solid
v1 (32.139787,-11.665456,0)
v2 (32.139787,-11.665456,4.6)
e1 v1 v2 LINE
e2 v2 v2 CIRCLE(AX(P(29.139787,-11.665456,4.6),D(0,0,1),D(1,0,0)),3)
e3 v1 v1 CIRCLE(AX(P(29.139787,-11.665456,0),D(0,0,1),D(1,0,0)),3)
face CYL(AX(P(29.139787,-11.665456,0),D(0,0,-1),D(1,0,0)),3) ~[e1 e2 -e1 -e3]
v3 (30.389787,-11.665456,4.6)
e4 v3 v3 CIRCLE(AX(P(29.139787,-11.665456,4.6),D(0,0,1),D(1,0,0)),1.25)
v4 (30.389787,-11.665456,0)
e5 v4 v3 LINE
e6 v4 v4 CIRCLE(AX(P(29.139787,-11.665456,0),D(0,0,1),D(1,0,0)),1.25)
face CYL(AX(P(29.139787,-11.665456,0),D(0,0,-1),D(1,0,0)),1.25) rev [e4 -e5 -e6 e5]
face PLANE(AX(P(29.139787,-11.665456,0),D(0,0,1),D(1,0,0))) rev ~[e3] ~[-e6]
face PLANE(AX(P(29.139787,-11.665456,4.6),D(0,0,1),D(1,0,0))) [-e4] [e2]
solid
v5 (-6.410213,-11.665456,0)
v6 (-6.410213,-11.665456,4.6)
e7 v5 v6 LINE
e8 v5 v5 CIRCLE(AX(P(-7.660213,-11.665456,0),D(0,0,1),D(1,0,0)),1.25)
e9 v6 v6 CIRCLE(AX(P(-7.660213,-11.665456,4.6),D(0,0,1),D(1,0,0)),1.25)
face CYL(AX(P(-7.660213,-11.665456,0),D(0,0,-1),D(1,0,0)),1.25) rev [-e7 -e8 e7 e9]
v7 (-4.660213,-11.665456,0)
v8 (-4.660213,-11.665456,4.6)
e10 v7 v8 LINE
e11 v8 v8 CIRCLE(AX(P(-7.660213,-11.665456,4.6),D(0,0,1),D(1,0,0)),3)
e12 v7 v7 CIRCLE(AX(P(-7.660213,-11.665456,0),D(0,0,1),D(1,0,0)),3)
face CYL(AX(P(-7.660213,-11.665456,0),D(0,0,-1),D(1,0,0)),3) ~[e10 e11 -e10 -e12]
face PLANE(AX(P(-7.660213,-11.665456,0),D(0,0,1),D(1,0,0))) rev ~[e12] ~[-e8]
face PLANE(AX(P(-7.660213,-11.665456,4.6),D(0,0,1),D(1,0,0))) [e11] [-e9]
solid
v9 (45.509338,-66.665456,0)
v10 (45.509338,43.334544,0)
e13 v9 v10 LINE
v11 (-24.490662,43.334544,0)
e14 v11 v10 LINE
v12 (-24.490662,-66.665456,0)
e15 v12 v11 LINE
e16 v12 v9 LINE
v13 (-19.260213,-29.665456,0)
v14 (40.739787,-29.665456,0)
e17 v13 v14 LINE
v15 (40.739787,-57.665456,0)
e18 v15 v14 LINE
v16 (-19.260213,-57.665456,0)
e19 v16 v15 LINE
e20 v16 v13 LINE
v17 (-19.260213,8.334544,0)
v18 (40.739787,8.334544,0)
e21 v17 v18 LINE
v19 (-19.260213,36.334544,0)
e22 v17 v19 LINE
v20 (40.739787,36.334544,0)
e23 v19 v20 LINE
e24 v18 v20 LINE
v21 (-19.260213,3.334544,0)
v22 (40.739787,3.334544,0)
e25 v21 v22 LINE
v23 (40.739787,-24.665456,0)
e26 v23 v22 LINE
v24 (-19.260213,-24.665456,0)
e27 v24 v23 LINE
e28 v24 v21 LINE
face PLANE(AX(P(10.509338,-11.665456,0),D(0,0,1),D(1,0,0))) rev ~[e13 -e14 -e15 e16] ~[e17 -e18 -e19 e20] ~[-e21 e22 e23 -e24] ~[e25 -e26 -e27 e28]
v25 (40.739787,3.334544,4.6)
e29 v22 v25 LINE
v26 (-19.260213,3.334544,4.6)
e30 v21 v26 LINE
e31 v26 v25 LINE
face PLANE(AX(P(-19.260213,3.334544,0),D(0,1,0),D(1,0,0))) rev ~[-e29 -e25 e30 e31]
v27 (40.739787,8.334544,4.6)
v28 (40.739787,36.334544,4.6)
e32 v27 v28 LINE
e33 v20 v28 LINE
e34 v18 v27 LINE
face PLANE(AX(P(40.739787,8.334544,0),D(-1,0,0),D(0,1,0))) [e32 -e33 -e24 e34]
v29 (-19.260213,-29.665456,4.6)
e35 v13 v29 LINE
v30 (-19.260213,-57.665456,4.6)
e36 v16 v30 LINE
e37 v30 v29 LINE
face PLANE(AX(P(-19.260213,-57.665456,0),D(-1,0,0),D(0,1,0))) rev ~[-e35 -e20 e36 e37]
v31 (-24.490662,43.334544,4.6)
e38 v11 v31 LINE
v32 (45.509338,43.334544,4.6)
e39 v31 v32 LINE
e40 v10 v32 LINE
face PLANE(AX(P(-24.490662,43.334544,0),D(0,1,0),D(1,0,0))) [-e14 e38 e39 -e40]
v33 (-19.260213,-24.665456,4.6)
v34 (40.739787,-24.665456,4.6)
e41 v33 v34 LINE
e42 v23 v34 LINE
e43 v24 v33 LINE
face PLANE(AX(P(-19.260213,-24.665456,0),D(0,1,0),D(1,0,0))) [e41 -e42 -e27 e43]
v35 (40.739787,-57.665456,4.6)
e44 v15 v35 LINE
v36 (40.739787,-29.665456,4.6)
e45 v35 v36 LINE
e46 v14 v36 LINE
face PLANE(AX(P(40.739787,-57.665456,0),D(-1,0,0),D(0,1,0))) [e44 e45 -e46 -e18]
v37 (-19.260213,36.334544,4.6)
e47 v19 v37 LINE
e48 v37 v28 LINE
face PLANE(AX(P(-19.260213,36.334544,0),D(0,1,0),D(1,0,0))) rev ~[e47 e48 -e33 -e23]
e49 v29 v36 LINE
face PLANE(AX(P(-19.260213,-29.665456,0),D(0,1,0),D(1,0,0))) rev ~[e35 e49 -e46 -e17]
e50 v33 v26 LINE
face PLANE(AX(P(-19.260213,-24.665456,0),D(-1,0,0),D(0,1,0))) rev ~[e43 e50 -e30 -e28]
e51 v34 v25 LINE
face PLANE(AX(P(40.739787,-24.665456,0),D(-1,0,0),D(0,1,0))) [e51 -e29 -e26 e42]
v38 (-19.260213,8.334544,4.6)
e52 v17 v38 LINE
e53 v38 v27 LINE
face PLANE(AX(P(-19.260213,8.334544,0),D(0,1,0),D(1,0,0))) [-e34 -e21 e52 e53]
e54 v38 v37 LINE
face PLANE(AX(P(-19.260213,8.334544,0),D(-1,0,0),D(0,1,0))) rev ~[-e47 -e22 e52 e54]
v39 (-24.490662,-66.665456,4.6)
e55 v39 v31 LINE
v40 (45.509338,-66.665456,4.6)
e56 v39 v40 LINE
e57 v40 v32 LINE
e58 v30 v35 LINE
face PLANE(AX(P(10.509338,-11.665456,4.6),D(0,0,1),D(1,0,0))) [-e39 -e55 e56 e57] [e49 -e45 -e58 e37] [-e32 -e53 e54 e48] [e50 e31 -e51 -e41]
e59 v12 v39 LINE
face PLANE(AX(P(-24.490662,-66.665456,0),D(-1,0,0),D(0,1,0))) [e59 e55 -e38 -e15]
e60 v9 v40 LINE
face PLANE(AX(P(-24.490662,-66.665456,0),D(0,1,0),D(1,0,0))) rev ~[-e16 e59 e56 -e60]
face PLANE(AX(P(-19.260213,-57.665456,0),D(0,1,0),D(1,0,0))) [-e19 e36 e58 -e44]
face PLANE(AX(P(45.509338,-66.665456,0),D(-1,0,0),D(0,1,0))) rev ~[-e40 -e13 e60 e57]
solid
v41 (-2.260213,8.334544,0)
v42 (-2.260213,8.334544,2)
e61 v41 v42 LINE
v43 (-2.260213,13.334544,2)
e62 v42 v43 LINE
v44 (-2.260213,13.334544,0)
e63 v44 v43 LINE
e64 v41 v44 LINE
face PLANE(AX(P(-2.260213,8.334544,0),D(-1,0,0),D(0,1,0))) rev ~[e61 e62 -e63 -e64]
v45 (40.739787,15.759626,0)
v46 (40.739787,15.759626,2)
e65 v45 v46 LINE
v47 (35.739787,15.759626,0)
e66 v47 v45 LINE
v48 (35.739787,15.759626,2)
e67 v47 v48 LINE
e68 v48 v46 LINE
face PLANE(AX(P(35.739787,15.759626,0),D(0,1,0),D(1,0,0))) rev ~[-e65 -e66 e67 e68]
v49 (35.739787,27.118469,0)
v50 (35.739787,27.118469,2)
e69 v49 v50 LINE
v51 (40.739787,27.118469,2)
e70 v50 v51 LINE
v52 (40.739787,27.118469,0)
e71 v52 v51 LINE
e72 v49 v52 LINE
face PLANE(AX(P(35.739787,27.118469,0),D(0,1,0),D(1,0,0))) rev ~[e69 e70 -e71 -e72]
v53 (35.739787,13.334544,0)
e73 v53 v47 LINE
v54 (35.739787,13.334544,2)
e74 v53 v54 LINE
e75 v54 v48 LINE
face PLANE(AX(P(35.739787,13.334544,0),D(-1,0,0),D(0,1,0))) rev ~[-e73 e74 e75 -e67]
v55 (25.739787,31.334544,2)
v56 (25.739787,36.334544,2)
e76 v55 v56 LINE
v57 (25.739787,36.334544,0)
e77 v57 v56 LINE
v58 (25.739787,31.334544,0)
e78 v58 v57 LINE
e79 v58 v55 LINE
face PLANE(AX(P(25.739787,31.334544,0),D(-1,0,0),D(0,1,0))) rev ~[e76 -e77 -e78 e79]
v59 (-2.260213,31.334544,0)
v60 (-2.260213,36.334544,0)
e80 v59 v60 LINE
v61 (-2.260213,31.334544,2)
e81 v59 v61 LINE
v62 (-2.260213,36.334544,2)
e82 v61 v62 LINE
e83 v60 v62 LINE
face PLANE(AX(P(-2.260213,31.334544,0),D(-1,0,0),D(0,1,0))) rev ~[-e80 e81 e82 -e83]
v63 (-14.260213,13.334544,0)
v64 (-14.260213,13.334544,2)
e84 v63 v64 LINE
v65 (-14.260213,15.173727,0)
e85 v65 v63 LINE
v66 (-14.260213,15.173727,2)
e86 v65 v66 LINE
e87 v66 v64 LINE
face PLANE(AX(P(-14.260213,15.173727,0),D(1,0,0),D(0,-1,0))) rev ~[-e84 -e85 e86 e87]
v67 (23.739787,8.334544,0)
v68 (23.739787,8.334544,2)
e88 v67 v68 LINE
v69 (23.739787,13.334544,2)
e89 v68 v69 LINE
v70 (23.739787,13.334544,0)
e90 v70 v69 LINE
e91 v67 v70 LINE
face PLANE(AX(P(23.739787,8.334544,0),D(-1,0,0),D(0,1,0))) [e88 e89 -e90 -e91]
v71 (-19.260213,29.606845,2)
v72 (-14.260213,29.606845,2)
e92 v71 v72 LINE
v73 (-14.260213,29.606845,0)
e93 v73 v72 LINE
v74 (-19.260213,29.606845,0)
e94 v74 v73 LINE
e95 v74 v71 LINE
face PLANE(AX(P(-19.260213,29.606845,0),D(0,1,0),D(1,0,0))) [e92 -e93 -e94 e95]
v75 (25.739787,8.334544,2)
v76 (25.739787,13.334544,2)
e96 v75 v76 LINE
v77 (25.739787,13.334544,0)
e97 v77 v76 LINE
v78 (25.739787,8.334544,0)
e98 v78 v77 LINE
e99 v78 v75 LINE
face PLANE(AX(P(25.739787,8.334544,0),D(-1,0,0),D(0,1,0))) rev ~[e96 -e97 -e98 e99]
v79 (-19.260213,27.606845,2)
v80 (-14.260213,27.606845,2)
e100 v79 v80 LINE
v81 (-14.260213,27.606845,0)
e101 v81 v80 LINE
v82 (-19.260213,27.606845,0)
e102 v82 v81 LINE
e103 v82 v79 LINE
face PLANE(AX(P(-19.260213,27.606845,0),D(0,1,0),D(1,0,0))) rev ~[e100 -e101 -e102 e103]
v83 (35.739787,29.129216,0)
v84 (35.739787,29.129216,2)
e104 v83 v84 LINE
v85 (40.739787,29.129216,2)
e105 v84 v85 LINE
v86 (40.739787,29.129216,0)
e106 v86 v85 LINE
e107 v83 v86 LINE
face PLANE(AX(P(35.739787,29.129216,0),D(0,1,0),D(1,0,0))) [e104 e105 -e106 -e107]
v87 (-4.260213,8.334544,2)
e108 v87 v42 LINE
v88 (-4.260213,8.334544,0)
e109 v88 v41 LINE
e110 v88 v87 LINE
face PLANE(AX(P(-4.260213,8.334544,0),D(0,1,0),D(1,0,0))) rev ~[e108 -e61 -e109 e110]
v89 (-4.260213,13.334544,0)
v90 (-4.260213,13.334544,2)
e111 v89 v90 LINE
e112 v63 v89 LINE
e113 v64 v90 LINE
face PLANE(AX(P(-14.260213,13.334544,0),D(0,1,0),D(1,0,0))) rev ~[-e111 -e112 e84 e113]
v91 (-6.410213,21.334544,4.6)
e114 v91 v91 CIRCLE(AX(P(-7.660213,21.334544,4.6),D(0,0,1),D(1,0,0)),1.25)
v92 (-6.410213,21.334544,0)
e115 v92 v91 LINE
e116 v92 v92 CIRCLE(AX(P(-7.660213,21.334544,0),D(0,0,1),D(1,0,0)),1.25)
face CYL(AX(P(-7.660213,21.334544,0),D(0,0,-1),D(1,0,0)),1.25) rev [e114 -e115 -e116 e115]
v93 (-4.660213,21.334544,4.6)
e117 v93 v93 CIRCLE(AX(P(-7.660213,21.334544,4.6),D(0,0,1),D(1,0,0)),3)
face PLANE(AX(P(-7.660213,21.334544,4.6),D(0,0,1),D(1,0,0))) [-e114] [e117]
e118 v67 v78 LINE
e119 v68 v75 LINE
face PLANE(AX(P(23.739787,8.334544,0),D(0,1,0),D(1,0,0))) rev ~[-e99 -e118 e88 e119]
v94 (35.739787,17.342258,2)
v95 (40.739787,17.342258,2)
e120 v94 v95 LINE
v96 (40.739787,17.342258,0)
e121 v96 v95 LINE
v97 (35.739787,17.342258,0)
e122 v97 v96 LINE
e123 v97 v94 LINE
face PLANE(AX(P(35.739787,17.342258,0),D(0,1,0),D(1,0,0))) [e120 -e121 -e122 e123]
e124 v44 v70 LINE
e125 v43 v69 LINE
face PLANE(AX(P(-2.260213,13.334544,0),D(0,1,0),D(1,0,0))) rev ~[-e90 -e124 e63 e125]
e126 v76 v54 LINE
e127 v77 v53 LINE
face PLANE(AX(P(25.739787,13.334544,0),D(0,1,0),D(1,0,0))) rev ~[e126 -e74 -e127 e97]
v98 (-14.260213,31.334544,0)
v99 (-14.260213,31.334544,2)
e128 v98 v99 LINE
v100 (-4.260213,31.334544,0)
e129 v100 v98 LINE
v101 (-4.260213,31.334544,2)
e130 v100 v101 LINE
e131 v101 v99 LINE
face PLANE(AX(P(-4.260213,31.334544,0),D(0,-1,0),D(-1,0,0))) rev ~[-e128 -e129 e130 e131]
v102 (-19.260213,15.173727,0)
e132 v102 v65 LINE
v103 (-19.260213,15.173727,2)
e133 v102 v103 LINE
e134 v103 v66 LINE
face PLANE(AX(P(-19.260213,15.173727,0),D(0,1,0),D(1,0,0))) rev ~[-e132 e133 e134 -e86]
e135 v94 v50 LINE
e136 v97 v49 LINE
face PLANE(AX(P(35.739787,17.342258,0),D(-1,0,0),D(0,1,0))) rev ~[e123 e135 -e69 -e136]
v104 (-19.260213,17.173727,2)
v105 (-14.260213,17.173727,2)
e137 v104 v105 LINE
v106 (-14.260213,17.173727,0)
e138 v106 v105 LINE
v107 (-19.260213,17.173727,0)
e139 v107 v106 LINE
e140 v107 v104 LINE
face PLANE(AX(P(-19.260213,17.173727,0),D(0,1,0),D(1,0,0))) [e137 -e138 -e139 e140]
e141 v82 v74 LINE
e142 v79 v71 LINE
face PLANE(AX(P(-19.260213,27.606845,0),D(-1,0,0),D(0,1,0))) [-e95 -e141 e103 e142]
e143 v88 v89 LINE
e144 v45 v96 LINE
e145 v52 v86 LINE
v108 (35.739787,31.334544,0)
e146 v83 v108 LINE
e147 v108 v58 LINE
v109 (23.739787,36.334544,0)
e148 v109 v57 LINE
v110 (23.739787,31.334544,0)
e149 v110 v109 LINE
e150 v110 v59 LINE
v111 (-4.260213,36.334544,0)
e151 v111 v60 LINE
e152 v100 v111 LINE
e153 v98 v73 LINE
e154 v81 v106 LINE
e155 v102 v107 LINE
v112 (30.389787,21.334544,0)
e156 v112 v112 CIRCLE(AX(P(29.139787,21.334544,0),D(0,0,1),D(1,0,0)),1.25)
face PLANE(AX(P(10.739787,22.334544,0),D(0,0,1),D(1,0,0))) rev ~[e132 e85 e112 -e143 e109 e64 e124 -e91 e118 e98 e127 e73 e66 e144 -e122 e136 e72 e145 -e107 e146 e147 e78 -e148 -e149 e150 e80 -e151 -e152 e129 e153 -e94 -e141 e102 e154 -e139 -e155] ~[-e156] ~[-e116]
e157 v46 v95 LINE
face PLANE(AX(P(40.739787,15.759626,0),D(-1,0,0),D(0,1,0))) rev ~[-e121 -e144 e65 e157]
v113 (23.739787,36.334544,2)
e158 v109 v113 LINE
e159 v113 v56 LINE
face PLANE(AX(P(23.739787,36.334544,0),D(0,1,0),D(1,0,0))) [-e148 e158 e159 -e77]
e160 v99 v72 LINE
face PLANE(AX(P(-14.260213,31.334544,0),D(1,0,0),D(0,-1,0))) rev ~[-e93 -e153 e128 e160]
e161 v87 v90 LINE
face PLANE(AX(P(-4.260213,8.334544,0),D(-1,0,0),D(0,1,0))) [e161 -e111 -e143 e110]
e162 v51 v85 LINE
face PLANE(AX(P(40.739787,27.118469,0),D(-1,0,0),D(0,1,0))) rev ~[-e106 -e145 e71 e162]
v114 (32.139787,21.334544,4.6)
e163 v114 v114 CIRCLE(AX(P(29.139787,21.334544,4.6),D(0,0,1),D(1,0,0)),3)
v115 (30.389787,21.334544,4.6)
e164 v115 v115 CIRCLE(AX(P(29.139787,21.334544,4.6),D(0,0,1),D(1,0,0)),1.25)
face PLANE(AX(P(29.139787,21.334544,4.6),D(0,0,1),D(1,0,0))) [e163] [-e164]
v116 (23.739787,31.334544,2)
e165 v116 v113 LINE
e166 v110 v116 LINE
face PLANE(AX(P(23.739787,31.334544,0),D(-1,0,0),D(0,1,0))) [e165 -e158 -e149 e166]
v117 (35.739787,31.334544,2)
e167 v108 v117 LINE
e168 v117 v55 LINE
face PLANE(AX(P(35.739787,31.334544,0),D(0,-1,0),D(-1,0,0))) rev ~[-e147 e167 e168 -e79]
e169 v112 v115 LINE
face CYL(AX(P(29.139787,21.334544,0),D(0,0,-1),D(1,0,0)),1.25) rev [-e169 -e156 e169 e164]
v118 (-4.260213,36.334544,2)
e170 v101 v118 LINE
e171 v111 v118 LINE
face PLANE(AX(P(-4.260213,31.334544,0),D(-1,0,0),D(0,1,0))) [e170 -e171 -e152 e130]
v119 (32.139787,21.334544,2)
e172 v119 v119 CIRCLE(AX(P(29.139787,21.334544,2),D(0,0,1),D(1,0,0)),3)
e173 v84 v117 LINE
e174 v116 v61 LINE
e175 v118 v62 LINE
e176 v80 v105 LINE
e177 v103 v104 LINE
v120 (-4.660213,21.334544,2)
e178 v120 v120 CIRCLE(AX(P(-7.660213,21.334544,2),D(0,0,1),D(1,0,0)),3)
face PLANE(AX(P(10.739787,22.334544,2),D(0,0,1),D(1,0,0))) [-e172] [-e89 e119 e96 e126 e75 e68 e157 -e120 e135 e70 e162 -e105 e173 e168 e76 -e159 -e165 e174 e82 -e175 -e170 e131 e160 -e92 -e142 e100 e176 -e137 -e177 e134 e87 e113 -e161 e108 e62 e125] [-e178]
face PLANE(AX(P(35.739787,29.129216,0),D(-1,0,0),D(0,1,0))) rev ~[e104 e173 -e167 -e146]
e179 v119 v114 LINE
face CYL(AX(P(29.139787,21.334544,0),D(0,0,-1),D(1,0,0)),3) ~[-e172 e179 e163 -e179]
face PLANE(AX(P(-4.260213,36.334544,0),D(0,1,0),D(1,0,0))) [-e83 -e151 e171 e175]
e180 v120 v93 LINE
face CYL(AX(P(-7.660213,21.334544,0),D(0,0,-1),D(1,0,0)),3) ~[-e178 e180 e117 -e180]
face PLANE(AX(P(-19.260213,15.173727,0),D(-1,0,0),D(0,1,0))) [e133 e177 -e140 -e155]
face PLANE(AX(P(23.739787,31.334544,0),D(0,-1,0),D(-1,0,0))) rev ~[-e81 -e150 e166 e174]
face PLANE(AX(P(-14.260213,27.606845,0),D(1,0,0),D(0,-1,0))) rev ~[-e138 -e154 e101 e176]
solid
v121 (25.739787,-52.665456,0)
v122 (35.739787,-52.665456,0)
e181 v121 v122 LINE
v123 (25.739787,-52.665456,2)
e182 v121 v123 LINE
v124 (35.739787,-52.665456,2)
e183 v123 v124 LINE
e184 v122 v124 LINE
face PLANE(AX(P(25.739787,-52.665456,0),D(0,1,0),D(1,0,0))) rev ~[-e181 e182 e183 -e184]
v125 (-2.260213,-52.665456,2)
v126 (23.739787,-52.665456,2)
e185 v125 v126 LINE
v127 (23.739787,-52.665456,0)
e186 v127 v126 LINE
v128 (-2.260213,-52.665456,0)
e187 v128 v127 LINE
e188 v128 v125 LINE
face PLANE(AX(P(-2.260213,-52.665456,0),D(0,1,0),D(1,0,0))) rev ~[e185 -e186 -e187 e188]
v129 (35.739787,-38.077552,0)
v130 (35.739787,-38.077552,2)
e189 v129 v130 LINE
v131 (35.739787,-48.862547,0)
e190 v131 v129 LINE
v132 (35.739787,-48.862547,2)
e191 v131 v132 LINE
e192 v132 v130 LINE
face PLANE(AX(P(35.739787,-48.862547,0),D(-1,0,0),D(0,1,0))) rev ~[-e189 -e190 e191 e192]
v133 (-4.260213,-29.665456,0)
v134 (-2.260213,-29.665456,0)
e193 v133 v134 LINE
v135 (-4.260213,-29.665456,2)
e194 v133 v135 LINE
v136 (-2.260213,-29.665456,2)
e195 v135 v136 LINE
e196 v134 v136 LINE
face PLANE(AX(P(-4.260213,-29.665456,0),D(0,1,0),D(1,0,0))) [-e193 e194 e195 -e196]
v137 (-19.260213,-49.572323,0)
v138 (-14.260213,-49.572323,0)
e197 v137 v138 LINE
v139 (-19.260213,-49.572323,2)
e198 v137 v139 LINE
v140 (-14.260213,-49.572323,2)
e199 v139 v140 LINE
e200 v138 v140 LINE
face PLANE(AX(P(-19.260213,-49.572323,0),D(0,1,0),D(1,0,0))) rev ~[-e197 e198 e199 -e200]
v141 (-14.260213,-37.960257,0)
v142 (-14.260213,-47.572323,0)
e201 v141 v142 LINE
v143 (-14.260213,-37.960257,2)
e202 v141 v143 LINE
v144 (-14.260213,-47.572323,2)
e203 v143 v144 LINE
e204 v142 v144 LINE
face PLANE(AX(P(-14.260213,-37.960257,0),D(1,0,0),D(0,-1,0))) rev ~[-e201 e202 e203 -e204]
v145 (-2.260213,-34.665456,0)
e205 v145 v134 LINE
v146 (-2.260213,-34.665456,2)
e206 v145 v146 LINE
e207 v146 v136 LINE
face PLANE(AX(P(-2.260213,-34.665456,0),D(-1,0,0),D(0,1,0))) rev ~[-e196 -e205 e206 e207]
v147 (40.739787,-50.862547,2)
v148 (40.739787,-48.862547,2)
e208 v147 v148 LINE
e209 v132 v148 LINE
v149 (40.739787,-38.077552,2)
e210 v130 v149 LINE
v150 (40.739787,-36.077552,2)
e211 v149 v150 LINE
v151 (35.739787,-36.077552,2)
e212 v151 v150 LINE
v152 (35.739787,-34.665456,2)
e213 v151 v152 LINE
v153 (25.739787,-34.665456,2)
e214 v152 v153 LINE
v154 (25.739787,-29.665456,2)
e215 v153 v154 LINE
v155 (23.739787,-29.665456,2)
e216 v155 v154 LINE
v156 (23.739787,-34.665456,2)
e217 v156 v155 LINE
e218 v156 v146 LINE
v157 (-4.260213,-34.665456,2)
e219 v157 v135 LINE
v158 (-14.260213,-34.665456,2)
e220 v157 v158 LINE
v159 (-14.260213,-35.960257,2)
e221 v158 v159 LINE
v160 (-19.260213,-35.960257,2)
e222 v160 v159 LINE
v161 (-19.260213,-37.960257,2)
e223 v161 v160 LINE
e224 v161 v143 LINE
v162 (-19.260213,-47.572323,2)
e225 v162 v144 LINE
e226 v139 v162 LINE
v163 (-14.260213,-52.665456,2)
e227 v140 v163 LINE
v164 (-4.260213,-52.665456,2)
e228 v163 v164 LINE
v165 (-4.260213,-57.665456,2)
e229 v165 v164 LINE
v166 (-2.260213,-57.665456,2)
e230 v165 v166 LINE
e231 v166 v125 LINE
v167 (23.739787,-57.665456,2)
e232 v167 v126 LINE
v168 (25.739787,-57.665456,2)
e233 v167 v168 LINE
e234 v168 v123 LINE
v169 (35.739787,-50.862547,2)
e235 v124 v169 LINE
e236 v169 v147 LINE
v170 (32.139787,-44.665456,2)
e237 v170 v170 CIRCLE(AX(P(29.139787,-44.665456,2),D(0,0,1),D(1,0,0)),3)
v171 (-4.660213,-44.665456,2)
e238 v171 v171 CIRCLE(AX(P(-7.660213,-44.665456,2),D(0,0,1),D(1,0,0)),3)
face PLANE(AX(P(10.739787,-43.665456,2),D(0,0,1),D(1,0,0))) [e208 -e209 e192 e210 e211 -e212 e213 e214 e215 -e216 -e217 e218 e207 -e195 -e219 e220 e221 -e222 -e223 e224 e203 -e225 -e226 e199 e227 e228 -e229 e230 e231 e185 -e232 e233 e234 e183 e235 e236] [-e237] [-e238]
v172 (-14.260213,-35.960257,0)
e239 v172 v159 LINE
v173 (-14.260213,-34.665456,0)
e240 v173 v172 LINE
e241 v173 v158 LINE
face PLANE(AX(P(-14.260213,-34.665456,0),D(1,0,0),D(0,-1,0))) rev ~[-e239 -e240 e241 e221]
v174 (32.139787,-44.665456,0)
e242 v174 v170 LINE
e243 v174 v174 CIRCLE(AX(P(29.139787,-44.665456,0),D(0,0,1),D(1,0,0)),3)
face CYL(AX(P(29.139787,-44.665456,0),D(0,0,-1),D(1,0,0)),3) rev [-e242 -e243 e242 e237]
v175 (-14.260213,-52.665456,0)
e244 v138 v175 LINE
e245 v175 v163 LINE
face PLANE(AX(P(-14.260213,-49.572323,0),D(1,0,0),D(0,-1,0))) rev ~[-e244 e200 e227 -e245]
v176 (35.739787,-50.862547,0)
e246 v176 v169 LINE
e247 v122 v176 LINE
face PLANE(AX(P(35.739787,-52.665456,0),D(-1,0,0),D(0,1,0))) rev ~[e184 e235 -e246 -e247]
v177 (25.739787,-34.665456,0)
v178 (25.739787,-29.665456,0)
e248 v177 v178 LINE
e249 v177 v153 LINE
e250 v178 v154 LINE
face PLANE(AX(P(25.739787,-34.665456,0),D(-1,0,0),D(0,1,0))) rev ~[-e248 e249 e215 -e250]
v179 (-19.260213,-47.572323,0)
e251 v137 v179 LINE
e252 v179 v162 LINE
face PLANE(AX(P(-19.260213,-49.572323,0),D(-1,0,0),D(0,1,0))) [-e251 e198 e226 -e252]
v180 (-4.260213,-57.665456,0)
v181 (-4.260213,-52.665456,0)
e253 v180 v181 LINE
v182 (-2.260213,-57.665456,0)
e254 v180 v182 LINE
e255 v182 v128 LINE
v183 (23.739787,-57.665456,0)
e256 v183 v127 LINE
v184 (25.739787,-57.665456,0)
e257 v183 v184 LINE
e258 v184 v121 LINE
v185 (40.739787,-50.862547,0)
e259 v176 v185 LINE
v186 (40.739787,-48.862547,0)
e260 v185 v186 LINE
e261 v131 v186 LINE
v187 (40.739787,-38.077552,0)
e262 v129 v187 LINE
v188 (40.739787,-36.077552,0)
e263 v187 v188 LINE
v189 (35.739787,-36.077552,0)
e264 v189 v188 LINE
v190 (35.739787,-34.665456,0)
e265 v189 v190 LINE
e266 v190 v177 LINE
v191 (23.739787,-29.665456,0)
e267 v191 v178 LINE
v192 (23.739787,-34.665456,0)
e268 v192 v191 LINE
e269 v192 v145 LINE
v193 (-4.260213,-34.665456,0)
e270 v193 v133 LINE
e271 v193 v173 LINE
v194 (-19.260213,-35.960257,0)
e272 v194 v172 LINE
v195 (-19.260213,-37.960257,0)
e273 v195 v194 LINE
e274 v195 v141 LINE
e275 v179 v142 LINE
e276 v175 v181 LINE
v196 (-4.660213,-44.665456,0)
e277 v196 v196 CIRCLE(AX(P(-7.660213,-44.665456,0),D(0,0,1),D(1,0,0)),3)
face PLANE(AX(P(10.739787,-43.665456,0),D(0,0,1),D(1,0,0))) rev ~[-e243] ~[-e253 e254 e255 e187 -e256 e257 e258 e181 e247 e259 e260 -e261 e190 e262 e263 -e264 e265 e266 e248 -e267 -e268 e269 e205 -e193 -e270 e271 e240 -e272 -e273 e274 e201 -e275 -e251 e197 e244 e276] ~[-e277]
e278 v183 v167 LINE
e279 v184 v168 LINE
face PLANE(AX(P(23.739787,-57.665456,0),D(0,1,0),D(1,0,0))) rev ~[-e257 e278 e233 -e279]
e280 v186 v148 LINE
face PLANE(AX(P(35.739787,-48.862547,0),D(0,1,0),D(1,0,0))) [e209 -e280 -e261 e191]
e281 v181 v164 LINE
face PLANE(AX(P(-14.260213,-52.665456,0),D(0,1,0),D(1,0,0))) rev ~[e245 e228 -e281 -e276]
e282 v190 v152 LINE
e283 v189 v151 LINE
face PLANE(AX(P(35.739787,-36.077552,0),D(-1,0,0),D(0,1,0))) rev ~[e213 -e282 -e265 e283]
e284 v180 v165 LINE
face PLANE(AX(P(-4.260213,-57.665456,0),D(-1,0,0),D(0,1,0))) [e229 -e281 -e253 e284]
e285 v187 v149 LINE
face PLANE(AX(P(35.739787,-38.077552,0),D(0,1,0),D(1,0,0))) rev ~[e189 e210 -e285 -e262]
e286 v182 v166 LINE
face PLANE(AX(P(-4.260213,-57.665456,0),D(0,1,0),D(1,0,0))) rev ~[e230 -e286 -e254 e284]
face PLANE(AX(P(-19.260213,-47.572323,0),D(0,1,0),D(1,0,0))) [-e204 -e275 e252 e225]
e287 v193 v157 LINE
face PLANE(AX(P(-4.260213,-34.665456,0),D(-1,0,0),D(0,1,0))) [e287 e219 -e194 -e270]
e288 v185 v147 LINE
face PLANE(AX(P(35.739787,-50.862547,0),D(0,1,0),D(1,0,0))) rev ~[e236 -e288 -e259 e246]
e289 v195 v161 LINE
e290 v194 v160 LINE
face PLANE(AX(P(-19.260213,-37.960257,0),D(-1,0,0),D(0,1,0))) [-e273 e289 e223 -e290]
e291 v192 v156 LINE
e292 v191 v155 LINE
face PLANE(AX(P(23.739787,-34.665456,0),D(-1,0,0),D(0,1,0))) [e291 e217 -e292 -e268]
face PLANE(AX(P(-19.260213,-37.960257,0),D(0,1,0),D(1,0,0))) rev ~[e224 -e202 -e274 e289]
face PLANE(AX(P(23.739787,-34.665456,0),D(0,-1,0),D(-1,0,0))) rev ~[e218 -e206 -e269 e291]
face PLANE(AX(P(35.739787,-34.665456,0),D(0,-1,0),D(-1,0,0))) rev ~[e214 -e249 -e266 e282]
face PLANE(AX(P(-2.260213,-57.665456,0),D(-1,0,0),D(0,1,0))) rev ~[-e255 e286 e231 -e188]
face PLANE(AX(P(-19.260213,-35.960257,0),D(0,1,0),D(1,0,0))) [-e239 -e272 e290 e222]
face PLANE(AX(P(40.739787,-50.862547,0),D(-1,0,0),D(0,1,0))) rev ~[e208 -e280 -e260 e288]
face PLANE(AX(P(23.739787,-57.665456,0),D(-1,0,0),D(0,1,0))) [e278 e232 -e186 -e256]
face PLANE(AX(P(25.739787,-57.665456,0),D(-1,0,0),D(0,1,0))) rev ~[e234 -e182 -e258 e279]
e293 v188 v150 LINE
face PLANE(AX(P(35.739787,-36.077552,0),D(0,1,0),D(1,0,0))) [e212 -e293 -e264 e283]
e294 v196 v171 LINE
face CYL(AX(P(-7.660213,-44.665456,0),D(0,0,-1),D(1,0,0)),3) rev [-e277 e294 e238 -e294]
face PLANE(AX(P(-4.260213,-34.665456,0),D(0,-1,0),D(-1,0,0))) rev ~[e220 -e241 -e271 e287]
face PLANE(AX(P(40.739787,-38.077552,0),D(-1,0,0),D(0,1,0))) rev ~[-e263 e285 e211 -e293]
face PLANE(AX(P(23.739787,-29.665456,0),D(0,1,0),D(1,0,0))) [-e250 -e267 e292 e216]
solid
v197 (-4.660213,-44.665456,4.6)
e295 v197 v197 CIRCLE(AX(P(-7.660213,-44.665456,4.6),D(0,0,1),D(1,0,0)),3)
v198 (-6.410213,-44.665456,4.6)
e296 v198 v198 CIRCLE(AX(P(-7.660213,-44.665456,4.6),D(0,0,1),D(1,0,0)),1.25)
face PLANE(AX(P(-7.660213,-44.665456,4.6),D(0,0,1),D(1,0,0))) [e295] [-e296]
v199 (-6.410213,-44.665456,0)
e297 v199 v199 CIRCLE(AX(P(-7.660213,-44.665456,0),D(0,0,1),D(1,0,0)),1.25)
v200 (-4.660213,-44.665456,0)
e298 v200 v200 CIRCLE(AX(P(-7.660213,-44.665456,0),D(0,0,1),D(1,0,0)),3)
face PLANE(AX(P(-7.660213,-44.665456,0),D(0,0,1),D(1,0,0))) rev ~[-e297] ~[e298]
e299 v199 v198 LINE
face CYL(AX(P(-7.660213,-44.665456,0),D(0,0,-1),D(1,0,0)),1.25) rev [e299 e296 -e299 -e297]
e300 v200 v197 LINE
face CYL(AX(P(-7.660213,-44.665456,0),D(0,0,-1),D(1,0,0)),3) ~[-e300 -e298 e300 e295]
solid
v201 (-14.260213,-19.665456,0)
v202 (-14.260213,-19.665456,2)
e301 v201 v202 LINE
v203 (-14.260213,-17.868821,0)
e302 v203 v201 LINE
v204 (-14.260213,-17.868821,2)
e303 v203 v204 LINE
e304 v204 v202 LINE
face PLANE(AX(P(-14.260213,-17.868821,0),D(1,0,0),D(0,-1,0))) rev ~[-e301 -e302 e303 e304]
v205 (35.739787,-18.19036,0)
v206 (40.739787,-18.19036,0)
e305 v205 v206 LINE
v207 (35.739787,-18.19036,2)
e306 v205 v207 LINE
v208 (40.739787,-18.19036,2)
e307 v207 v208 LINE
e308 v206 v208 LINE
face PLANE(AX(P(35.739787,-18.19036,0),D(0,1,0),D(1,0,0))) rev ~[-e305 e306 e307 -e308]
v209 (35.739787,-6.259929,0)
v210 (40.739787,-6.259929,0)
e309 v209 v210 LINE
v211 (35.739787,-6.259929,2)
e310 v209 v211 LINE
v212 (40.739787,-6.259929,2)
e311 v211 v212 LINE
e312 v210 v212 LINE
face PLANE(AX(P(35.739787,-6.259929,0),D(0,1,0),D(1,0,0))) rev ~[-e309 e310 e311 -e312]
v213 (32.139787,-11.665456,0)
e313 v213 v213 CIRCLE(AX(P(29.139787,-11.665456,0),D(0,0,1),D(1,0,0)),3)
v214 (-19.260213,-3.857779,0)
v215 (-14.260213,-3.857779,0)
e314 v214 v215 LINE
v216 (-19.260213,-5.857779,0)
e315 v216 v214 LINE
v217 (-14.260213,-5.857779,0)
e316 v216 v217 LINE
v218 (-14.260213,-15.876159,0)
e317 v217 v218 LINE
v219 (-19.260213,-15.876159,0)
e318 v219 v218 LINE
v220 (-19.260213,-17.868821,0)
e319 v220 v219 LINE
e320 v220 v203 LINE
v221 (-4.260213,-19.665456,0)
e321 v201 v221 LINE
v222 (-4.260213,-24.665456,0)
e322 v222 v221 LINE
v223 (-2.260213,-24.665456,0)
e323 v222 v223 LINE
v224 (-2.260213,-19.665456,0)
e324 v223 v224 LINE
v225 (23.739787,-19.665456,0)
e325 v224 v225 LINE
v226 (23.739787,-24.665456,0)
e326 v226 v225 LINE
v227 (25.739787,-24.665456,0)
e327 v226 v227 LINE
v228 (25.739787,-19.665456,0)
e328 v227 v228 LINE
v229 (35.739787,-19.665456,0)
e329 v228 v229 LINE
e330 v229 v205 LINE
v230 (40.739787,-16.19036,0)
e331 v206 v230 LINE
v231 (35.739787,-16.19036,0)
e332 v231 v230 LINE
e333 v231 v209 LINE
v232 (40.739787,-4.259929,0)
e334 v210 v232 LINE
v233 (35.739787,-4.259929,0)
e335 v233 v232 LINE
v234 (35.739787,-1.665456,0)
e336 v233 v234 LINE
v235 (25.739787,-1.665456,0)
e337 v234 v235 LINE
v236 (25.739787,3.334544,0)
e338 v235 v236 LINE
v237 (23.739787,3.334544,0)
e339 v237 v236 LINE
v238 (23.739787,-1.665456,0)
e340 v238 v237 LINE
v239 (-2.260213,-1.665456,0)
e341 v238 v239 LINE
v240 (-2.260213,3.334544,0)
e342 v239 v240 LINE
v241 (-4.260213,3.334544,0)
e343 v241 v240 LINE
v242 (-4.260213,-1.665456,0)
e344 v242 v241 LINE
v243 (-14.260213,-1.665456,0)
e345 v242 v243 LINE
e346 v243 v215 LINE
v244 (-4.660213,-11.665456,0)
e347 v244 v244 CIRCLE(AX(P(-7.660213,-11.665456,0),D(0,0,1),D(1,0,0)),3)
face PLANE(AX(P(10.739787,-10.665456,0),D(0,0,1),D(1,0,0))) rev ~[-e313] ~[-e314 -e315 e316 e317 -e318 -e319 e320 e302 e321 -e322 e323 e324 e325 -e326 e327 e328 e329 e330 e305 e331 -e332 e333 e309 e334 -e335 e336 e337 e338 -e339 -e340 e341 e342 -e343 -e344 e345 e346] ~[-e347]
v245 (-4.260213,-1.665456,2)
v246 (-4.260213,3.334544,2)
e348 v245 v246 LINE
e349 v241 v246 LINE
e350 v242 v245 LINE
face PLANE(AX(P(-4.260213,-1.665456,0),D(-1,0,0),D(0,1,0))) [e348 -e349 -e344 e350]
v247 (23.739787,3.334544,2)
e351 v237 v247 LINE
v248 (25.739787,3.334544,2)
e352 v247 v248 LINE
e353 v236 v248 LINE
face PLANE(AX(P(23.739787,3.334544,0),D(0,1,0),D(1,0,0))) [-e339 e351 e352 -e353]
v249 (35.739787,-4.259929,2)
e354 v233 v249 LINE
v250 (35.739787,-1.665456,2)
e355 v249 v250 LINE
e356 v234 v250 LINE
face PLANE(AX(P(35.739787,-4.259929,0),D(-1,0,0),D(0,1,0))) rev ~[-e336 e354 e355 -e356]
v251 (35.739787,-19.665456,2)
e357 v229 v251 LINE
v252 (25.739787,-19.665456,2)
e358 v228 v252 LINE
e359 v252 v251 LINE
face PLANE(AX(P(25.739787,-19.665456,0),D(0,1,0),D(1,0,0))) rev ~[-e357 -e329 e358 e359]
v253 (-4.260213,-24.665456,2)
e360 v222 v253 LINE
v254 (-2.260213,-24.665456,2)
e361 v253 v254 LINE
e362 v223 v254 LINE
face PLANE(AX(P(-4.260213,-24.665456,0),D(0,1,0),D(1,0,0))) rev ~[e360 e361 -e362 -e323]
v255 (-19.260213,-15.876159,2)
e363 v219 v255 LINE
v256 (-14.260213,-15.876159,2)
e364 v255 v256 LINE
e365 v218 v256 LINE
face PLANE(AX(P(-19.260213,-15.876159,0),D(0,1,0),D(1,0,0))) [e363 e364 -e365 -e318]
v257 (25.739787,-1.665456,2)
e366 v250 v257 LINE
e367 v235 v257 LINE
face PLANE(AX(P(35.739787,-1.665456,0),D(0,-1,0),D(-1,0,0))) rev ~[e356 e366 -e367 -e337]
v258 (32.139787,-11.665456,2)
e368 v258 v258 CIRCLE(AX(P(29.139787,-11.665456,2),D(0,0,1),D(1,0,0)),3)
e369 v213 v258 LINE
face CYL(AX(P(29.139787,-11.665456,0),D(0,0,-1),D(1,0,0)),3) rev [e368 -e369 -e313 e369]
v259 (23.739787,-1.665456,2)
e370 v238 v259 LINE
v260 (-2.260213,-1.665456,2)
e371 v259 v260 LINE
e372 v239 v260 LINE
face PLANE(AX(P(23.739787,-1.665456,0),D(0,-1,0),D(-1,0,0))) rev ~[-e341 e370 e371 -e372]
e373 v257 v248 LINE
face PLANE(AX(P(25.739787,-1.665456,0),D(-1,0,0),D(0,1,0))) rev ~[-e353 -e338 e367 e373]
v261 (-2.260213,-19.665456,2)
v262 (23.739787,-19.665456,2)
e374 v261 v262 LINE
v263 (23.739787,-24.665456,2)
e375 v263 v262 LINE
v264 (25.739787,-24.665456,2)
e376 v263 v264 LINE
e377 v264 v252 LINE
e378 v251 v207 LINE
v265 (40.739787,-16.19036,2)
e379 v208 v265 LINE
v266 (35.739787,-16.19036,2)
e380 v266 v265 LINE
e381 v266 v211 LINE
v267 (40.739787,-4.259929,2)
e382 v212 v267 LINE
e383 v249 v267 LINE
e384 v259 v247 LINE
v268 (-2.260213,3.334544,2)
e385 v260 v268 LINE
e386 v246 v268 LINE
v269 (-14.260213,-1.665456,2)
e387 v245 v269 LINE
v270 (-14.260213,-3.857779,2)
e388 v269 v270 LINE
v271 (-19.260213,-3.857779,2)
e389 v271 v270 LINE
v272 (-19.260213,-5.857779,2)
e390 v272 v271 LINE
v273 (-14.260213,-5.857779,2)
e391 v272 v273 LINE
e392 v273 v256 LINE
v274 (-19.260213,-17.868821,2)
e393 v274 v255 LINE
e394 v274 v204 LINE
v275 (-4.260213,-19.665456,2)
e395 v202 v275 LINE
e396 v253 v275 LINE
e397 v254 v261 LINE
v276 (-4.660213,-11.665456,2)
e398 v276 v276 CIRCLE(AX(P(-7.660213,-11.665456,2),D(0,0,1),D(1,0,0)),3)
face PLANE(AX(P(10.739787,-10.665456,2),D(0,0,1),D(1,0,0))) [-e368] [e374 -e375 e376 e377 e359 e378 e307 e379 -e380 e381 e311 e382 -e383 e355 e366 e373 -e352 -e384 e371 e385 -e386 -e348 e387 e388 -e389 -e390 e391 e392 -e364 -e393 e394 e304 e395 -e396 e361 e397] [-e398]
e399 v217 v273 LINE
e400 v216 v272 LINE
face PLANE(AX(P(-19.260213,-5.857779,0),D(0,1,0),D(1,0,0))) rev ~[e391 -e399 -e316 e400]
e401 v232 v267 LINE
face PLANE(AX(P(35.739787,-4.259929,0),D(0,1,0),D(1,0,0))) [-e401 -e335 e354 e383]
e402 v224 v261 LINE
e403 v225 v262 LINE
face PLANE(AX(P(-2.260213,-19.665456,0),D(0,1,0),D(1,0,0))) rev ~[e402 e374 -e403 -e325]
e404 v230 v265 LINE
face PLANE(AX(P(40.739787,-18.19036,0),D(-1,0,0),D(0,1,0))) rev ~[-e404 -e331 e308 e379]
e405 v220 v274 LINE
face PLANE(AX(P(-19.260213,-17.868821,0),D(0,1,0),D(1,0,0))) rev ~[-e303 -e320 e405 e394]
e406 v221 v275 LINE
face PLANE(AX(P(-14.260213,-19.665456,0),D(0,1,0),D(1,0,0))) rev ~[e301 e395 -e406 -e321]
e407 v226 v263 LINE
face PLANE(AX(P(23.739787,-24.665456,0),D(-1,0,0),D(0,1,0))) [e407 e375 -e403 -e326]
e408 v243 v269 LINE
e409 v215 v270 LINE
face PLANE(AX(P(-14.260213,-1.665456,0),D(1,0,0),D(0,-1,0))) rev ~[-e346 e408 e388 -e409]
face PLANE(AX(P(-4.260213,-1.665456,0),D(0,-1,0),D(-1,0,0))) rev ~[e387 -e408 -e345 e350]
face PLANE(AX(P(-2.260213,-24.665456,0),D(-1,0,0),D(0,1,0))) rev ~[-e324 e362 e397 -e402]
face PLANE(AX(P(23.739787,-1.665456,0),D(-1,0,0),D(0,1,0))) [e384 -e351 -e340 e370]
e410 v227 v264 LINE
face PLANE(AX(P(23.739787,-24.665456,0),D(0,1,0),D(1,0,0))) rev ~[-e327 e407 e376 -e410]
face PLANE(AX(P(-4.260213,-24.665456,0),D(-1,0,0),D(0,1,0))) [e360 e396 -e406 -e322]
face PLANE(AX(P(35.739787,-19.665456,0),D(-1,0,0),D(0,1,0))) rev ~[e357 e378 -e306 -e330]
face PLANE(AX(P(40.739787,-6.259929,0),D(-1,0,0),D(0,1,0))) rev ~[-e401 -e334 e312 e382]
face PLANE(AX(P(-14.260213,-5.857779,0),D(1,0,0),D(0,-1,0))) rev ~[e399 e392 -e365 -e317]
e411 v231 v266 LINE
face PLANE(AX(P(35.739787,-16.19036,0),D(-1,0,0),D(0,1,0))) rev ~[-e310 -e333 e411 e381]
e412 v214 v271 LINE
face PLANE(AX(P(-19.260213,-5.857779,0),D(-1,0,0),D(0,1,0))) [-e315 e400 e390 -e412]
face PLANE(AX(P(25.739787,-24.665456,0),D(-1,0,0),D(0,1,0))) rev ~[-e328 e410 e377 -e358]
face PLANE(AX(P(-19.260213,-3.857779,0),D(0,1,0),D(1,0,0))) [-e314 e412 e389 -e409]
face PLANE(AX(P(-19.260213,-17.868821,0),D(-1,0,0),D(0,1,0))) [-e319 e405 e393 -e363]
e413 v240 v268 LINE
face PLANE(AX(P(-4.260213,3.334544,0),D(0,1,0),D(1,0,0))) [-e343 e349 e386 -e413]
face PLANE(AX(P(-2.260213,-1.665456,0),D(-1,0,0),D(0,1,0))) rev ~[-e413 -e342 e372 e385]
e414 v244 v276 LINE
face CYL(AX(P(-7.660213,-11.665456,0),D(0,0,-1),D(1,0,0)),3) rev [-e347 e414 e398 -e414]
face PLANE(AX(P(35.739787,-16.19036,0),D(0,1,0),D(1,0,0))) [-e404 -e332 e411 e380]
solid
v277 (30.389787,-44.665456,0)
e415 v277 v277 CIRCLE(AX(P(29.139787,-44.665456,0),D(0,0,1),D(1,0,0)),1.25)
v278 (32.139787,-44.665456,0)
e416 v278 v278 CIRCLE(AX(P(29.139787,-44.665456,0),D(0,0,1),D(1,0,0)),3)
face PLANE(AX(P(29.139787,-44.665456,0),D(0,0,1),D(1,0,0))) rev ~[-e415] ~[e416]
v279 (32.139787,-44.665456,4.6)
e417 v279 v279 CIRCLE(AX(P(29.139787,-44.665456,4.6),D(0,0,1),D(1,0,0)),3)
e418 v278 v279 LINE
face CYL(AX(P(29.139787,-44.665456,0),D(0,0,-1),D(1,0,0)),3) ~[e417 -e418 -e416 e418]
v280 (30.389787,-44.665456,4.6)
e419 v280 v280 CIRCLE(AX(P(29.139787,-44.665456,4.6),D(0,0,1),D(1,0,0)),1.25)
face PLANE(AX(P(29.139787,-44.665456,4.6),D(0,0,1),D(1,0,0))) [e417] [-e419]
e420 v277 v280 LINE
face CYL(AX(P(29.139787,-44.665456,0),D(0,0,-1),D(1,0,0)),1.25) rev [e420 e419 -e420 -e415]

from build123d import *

# Parameters (mm, degrees)
F0_R     = 3
F0_W     = 2
F0_H     = 5
F0_W_2   = 5
F0_H_2   = 2
F0_H_3   = 2.0107477903
F0_H_4   = 1.5826318413
F1_DEPTH = 2
F0_H_5   = 1.9926615059
F2_W     = 70
F2_H     = 110
F2_W_2   = 60
F2_H_2   = 28
F3_DEPTH = 4.6
F0_R_2   = 1.25
F4_DEPTH = 4.6


with BuildPart() as f1:
    # F0 (on Top) → F1 (new body)
    with BuildSketch(Plane.XY):
        Polygon((-4.260212779, 31.3345443402), (-14.260212779, 31.3345443402), (-14.260212779, 29.606844902), (-14.260212779, 27.606844902), (-14.260212779, 22.3345443402), (-14.260212779, 20.3345443402), (-14.260212779, 17.1737267151), (-14.260212779, 15.1737267151), (-14.260212779, 13.3345443402), (-4.260212779, 13.3345443402), (-2.260212779, 13.3345443402), (8.7358048186, 13.3345443402), (10.7358048186, 13.3345443402), (23.739787221, 13.3345443402), (25.739787221, 13.3345443402), (35.739787221, 13.3345443402), (35.739787221, 15.7596264035), (35.739787221, 17.3422582448), (35.739787221, 20.3345443402), (35.739787221, 22.3345443402), (35.739787221, 27.1184686571), (35.739787221, 29.1292164475), (35.739787221, 31.3345443402), (25.739787221, 31.3345443402), (23.739787221, 31.3345443402), (10.739787221, 31.3345443402), (8.739787221, 31.3345443402), (-2.260212779, 31.3345443402), align=None)
        with Locations((-7.660212779, 21.3345443402)):
            Circle(F0_R, mode=Mode.SUBTRACT)
        with Locations((29.139787221, 21.3345443402)):
            Circle(F0_R, mode=Mode.SUBTRACT)
        with Locations((-3.260212779, 33.8345443402)):
            Rectangle(F0_W, F0_H)
        with Locations((-16.760212779, 28.606844902)):
            Rectangle(F0_W_2, F0_H_2)
        with Locations((24.739787221, 33.8345443402)):
            Rectangle(F0_W, F0_H)
        with Locations((-16.760212779, 16.1737267151)):
            Rectangle(F0_W_2, F0_H_2)
        with Locations((38.239787221, 28.1238425523)):
            Rectangle(F0_W_2, F0_H_3)
        with Locations((-3.260212779, 10.8345443402)):
            Rectangle(F0_W, F0_H)
        with Locations((38.239787221, 16.5509423241)):
            Rectangle(F0_W_2, F0_H_4)
        with Locations((24.739787221, 10.8345443402)):
            Rectangle(F0_W, F0_H)
    extrude(amount=F1_DEPTH)

    # F0 (on Top) → F4 (join)
    with BuildSketch(Plane.XY):
        with Locations((-7.660212779, 21.3345443402)):
            Circle(F0_R)
        with Locations((-7.660212779, 21.3345443402)):
            Circle(F0_R_2, mode=Mode.SUBTRACT)
        with Locations((29.139787221, 21.3345443402)):
            Circle(F0_R)
        with Locations((29.139787221, 21.3345443402)):
            Circle(F0_R_2, mode=Mode.SUBTRACT)
    extrude(amount=F4_DEPTH)


with BuildPart() as f1b:
    # F0 (on Top) → F1, piece 2 (new body)
    with BuildSketch(Plane.XY):
        Polygon((-4.260212779, -1.6654556598), (-14.260212779, -1.6654556598), (-14.260212779, -3.8577791788), (-14.260212779, -5.8577791788), (-14.260212779, -10.6654556598), (-14.260212779, -12.6654556598), (-14.260212779, -15.8761590719), (-14.260212779, -17.8688205779), (-14.260212779, -19.6654556598), (-4.260212779, -19.6654556598), (-2.260212779, -19.6654556598), (8.7807420641, -19.6654556598), (10.7807420641, -19.6654556598), (23.739787221, -19.6654556598), (25.739787221, -19.6654556598), (35.739787221, -19.6654556598), (35.739787221, -18.1903596967), (35.739787221, -16.1903596967), (35.739787221, -12.6654556598), (35.739787221, -10.6654556598), (35.739787221, -6.2599289231), (35.739787221, -4.2599289231), (35.739787221, -1.6654556598), (25.739787221, -1.6654556598), (23.739787221, -1.6654556598), (10.739787221, -1.6654556598), (8.739787221, -1.6654556598), (-2.260212779, -1.6654556598), align=None)
        with Locations((-7.660212779, -11.6654556598)):
            Circle(F0_R, mode=Mode.SUBTRACT)
        with Locations((29.139787221, -11.6654556598)):
            Circle(F0_R, mode=Mode.SUBTRACT)
        with Locations((-3.260212779, 0.8345443402)):
            Rectangle(F0_W, F0_H)
        with Locations((-16.760212779, -4.8577791788)):
            Rectangle(F0_W_2, F0_H_2)
        with Locations((24.739787221, 0.8345443402)):
            Rectangle(F0_W, F0_H)
        with Locations((-16.760212779, -16.8724898249)):
            Rectangle(F0_W_2, F0_H_5)
        with Locations((38.239787221, -5.2599289231)):
            Rectangle(F0_W_2, F0_H_2)
        with Locations((-3.260212779, -22.1654556598)):
            Rectangle(F0_W, F0_H)
        with Locations((38.239787221, -17.1903596967)):
            Rectangle(F0_W_2, F0_H_2)
        with Locations((24.739787221, -22.1654556598)):
            Rectangle(F0_W, F0_H)
    extrude(amount=F1_DEPTH)


with BuildPart() as f1c:
    # F0 (on Top) → F1, piece 3 (new body)
    with BuildSketch(Plane.XY):
        Polygon((-4.260212779, -34.6654556598), (-14.260212779, -34.6654556598), (-14.260212779, -35.9602573812), (-14.260212779, -37.9602573812), (-14.260212779, -41.6654556598), (-14.260212779, -43.6654556598), (-14.260212779, -47.5723225176), (-14.260212779, -49.5723225176), (-14.260212779, -52.6654556598), (-4.260212779, -52.6654556598), (-2.260212779, -52.6654556598), (8.3012469113, -52.6654556598), (10.3012469113, -52.6654556598), (23.739787221, -52.6654556598), (25.739787221, -52.6654556598), (35.739787221, -52.6654556598), (35.739787221, -50.8625470102), (35.739787221, -48.8625470102), (35.739787221, -45.6654556598), (35.739787221, -43.6654556598), (35.739787221, -38.0775518715), (35.739787221, -36.0775518715), (35.739787221, -34.6654556598), (25.739787221, -34.6654556598), (23.739787221, -34.6654556598), (10.7358048186, -34.6654556598), (8.7358048186, -34.6654556598), (-2.260212779, -34.6654556598), align=None)
        with Locations((-7.660212779, -44.6654556598)):
            Circle(F0_R, mode=Mode.SUBTRACT)
        with Locations((29.139787221, -44.6654556598)):
            Circle(F0_R, mode=Mode.SUBTRACT)
        with Locations((-3.260212779, -32.1654556598)):
            Rectangle(F0_W, F0_H)
        with Locations((-16.760212779, -36.9602573812)):
            Rectangle(F0_W_2, F0_H_2)
        with Locations((24.739787221, -32.1654556598)):
            Rectangle(F0_W, F0_H)
        with Locations((-16.760212779, -48.5723225176)):
            Rectangle(F0_W_2, F0_H_2)
        with Locations((38.239787221, -37.0775518715)):
            Rectangle(F0_W_2, F0_H_2)
        with Locations((-3.260212779, -55.1654556598)):
            Rectangle(F0_W, F0_H)
        with Locations((38.239787221, -49.8625470102)):
            Rectangle(F0_W_2, F0_H_2)
        with Locations((24.739787221, -55.1654556598)):
            Rectangle(F0_W, F0_H)
    extrude(amount=F1_DEPTH)


with BuildPart() as f3:
    # F2 (on Top) → F3 (new body)
    with BuildSketch(Plane.XY):
        with Locations((10.5093383789, -11.6654556598)):
            Rectangle(F2_W, F2_H)
        with Locations((10.739787221, -43.6654556598)):
            Rectangle(F2_W_2, F2_H_2, mode=Mode.SUBTRACT)
        with Locations((10.739787221, -10.6654556598)):
            Rectangle(F2_W_2, F2_H_2, mode=Mode.SUBTRACT)
        with Locations((10.739787221, 22.3345443402)):
            Rectangle(F2_W_2, F2_H_2, mode=Mode.SUBTRACT)
    extrude(amount=F3_DEPTH)


with BuildPart() as f4:
    # F0 (on Top) → F4, piece 2 (new body)
    with BuildSketch(Plane.XY):
        with Locations((-7.660212779, -11.6654556598)):
            Circle(F0_R)
        with Locations((-7.660212779, -11.6654556598)):
            Circle(F0_R_2, mode=Mode.SUBTRACT)
    extrude(amount=F4_DEPTH)


with BuildPart() as f4b:
    # F0 (on Top) → F4, piece 3 (new body)
    with BuildSketch(Plane.XY):
        with Locations((29.139787221, -11.6654556598)):
            Circle(F0_R)
        with Locations((29.139787221, -11.6654556598)):
            Circle(F0_R_2, mode=Mode.SUBTRACT)
    extrude(amount=F4_DEPTH)


with BuildPart() as f4c:
    # F0 (on Top) → F4, piece 4 (new body)
    with BuildSketch(Plane.XY):
        with Locations((-7.660212779, -44.6654556598)):
            Circle(F0_R)
        with Locations((-7.660212779, -44.6654556598)):
            Circle(F0_R_2, mode=Mode.SUBTRACT)
    extrude(amount=F4_DEPTH)


with BuildPart() as f4d:
    # F0 (on Top) → F4, piece 5 (new body)
    with BuildSketch(Plane.XY):
        with Locations((29.139787221, -44.6654556598)):
            Circle(F0_R)
        with Locations((29.139787221, -44.6654556598)):
            Circle(F0_R_2, mode=Mode.SUBTRACT)
    extrude(amount=F4_DEPTH)


solid = Compound([f1.part, f1b.part, f1c.part, f3.part, f4.part, f4b.part, f4c.part, f4d.part])
